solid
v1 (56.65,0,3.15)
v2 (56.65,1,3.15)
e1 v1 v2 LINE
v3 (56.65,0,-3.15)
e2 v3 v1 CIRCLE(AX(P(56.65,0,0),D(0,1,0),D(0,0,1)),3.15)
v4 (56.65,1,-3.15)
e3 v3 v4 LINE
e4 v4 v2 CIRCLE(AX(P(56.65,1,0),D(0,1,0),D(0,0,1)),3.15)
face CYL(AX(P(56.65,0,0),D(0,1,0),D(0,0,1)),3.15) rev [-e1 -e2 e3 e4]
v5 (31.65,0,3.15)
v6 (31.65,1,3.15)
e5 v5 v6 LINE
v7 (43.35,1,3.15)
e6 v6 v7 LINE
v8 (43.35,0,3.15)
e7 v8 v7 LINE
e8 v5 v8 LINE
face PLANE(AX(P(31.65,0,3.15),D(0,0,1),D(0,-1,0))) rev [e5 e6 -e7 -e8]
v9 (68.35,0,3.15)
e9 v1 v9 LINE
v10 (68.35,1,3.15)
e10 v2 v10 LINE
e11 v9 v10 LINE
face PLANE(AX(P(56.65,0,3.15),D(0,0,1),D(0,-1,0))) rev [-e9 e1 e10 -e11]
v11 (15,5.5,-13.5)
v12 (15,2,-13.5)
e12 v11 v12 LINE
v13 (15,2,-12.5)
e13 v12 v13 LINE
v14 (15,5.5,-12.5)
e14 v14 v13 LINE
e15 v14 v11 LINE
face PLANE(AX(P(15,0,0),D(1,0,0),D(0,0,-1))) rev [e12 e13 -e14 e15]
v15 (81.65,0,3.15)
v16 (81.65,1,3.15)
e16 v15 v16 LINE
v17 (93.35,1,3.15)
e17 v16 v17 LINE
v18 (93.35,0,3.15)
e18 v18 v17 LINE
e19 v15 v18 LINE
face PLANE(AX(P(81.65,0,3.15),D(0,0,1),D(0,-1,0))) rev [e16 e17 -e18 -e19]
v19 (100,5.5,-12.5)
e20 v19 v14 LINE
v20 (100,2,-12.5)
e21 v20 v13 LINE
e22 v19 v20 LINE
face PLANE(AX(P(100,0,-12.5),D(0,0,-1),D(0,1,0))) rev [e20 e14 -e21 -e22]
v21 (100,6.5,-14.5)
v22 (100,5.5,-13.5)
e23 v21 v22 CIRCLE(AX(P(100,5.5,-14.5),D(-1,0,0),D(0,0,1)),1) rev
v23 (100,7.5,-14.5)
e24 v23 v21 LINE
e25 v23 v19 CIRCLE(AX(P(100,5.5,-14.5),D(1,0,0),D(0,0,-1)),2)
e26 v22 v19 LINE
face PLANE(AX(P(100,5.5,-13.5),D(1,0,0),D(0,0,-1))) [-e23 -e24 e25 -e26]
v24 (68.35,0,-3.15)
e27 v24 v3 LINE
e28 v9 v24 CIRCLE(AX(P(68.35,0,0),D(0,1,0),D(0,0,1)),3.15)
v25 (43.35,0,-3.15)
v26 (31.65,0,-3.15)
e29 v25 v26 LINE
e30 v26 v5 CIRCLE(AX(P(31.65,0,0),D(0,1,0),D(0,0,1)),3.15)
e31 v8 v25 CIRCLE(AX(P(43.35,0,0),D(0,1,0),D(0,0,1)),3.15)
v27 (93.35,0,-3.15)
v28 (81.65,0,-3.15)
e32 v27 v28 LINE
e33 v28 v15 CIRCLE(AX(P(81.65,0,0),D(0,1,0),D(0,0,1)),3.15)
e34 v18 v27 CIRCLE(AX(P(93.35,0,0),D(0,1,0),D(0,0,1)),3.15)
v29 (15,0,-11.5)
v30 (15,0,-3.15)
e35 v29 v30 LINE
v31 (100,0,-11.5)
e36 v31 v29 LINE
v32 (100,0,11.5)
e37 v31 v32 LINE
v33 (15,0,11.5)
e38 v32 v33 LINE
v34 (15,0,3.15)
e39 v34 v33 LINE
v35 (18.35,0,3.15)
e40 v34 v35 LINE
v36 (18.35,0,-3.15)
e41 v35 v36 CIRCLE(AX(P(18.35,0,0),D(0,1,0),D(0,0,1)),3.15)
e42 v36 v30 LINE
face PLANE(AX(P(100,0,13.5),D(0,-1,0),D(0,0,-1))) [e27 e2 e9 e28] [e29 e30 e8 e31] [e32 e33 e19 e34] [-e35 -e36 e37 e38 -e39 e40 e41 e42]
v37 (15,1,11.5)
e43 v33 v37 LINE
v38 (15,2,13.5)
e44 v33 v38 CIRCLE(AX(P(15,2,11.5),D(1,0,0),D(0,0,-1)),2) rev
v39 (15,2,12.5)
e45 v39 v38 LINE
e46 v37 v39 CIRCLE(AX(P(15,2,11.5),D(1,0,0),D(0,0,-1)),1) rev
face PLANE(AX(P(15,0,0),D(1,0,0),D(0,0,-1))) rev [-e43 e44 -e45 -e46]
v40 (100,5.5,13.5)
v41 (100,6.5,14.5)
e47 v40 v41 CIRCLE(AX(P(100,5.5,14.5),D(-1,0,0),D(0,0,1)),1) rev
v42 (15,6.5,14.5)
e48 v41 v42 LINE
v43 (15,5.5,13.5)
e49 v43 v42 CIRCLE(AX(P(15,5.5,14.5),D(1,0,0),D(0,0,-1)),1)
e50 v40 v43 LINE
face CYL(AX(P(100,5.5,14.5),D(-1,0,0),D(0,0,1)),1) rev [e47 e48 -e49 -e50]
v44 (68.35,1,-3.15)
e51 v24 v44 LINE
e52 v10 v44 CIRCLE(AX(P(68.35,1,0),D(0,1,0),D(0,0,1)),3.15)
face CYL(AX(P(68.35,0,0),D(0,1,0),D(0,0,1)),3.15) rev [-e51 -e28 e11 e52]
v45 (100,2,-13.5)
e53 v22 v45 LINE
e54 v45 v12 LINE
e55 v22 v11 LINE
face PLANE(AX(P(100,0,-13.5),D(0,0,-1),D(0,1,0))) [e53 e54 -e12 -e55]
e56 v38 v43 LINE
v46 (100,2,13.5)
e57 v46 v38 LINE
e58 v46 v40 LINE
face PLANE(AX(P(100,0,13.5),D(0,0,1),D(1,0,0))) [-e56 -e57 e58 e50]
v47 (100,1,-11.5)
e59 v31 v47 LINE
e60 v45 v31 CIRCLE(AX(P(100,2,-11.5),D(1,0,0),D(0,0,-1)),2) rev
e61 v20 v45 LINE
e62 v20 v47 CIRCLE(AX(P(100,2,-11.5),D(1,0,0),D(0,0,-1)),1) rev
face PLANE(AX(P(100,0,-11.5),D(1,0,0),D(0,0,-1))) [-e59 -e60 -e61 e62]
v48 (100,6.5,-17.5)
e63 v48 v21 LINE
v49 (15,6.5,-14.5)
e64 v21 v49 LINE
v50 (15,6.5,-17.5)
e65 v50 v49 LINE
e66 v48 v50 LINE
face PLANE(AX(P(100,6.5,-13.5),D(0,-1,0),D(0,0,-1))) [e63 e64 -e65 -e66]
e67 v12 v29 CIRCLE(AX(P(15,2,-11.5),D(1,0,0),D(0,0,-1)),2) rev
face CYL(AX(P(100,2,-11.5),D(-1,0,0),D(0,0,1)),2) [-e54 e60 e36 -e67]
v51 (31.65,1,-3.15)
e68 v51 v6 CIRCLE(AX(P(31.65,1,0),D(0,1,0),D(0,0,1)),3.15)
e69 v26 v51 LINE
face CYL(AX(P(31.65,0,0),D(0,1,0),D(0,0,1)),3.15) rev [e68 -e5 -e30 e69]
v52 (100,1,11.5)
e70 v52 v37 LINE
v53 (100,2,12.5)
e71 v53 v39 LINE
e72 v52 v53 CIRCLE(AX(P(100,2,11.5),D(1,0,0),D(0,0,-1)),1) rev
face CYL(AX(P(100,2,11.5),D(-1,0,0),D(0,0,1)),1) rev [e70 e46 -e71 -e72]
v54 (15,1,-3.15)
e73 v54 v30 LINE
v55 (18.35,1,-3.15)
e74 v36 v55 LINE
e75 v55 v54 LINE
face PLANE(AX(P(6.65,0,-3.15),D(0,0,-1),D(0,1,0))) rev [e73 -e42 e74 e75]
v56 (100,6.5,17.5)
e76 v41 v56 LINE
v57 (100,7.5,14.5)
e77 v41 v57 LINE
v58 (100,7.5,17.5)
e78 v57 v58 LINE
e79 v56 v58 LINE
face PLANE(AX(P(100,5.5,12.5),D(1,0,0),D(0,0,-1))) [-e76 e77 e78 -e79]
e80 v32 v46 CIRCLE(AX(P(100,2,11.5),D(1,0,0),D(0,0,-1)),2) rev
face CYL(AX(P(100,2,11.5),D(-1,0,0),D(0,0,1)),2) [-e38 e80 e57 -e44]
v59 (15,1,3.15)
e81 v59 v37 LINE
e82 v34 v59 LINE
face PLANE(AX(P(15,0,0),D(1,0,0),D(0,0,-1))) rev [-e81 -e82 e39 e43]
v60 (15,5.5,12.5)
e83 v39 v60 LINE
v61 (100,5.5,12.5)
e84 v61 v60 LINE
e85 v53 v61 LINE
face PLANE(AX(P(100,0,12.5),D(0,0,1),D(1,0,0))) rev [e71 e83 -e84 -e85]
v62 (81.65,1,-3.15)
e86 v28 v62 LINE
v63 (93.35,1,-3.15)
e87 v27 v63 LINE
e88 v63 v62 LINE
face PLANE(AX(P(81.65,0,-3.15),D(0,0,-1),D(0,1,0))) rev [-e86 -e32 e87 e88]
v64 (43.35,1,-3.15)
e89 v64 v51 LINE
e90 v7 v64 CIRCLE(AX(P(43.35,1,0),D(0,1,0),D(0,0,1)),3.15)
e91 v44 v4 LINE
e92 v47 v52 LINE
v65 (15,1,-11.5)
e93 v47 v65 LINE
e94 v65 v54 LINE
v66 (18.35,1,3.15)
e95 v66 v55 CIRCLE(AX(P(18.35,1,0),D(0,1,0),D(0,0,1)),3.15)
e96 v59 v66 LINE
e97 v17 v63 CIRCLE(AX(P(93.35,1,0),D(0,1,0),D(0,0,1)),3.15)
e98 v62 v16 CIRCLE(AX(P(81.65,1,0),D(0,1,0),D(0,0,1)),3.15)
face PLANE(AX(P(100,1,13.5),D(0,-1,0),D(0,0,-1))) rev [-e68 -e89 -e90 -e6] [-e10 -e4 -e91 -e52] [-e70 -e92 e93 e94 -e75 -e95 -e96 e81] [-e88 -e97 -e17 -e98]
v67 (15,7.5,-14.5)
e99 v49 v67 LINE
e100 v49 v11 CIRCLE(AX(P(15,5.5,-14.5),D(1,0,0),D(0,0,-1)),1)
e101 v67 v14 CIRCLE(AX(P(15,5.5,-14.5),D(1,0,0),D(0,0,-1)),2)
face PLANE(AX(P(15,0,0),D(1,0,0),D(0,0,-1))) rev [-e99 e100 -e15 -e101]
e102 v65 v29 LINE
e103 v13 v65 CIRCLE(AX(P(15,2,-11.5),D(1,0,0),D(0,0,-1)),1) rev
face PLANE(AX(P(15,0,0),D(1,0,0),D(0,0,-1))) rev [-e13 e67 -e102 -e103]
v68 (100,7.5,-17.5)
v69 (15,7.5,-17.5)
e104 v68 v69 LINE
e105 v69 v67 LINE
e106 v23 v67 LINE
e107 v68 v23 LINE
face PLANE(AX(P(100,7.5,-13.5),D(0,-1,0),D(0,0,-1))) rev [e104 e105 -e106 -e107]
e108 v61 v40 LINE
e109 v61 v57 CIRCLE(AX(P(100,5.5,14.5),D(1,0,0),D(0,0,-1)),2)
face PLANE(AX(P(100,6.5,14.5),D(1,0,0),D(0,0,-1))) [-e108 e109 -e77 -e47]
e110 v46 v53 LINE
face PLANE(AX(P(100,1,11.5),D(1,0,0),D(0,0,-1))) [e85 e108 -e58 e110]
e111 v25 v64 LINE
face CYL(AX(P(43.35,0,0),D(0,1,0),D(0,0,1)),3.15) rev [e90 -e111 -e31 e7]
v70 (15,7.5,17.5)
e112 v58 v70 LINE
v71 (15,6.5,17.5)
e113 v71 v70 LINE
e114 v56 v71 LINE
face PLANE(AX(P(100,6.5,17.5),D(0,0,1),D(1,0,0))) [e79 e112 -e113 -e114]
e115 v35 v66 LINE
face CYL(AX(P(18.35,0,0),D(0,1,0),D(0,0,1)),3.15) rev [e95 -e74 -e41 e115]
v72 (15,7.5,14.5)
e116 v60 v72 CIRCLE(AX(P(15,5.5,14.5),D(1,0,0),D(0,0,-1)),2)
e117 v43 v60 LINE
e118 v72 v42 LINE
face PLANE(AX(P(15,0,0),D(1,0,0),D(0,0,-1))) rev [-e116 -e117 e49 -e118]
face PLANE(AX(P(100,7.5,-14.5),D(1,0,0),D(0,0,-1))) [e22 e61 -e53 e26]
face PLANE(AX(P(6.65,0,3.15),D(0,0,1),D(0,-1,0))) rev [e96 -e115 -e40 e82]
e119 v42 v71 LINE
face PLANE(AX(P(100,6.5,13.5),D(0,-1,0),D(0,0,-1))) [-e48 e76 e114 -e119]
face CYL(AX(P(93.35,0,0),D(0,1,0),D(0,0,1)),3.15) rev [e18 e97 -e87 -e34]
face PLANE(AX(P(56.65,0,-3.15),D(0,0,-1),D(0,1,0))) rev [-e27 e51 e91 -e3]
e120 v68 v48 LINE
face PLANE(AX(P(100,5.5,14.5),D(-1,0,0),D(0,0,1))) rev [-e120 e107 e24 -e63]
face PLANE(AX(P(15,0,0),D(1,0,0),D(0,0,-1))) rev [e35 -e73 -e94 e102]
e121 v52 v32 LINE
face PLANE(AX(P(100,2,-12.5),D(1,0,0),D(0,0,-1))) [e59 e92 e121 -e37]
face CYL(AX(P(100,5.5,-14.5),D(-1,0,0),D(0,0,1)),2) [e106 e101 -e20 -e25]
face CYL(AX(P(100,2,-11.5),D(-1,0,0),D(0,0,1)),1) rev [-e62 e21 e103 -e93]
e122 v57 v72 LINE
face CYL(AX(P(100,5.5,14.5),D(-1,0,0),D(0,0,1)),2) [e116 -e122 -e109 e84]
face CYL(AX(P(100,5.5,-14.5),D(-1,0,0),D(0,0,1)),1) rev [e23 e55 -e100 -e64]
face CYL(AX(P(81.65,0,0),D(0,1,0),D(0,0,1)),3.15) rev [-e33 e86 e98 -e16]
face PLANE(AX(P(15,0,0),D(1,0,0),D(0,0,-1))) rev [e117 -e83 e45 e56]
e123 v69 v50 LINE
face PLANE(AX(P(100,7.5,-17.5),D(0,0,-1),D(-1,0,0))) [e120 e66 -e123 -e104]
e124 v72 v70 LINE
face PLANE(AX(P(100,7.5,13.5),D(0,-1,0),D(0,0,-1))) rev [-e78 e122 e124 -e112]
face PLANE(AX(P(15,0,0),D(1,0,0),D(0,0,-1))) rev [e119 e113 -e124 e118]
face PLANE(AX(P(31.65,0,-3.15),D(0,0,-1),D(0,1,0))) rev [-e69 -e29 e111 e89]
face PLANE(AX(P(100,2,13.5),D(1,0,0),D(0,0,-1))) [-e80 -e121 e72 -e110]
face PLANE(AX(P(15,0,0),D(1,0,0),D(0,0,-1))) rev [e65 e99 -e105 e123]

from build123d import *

# Parameters (mm, degrees)
SM_BASE_FLANGE_1_DEPTH = 100
CUT_EXTRUDE_1_DEPTH    = 102.727577382
PATTERN_LINEAR_6_COUNT = 4
PATTERN_LINEAR_6_PITCH = 25
SKETCH2_W              = 120.770502754
SKETCH2_H              = 115.80541844
CUT_EXTRUDE1_DEPTH     = 15


# Sheet-metal steps are written as plain solids
with BuildPart() as part:
    # Sketch 1 → Базовая кромка1 (new body)
    with BuildSketch(Plane(origin=(0, 0, 0), x_dir=(0, 0, -1), z_dir=(1, 0, 0))):
        with BuildLine():
            Line((-17.5, 6.5), (-14.5, 6.5))
            ThreePointArc((-14.5, 6.5), (-13.792893219, 6.207106781), (-13.5, 5.5))
            Line((-13.5, 5.5), (-13.5, 2))
            ThreePointArc((-13.5, 2), (-12.914213562, 0.585786438), (-11.5, 0))
            Line((-11.5, 0), (11.5, 0))
            ThreePointArc((11.5, 0), (12.914213562, 0.585786438), (13.5, 2))
            Line((13.5, 2), (13.5, 5.5))
            ThreePointArc((13.5, 5.5), (13.792893219, 6.207106781), (14.5, 6.5))
            Line((14.5, 6.5), (17.5, 6.5))
            Line((17.5, 6.5), (17.5, 7.5))
            Line((17.5, 7.5), (14.5, 7.5))
            ThreePointArc((14.5, 7.5), (13.085786438, 6.914213562), (12.5, 5.5))
            Line((12.5, 5.5), (12.5, 2))
            ThreePointArc((12.5, 2), (12.207106781, 1.292893219), (11.5, 1))
            Line((11.5, 1), (-11.5, 1))
            ThreePointArc((-11.5, 1), (-12.207106781, 1.292893219), (-12.5, 2))
            Line((-12.5, 2), (-12.5, 5.5))
            ThreePointArc((-12.5, 5.5), (-13.085786438, 6.914213562), (-14.5, 7.5))
            Line((-14.5, 7.5), (-17.5, 7.5))
            Line((-17.5, 7.5), (-17.5, 6.5))
        make_face()
    extrude(amount=SM_BASE_FLANGE_1_DEPTH)

    # Эскиз6 → Вырез-Вытянуть1 (cut, through all)
    with BuildSketch(Plane(origin=(0, 1, 0), x_dir=(1, 0, 0), z_dir=(0, 1, 0))):
        with BuildLine():
            Line((6.65, 3.15), (18.35, 3.15))
            ThreePointArc((18.35, 3.15), (21.5, 0), (18.35, -3.15))
            Line((18.35, -3.15), (6.65, -3.15))
            ThreePointArc((6.65, -3.15), (3.5, 0), (6.65, 3.15))
        make_face()
    cut_extrude_1 = extrude(amount=-CUT_EXTRUDE_1_DEPTH, mode=Mode.SUBTRACT)

    # Линейный массив6: Вырез-Вытянуть1 ×4
    with Locations(*[(i * PATTERN_LINEAR_6_PITCH, 0, 0) for i in range(1, PATTERN_LINEAR_6_COUNT)]):
        add(cut_extrude_1, mode=Mode.SUBTRACT)

    # Sketch2 → Cut-Extrude1 (cut)
    with BuildSketch(Plane.ZY):
        with Locations((-11.279080545, 0.592045476)):
            Rectangle(SKETCH2_W, SKETCH2_H)
    extrude(amount=-CUT_EXTRUDE1_DEPTH, mode=Mode.SUBTRACT)


solid = part.part
